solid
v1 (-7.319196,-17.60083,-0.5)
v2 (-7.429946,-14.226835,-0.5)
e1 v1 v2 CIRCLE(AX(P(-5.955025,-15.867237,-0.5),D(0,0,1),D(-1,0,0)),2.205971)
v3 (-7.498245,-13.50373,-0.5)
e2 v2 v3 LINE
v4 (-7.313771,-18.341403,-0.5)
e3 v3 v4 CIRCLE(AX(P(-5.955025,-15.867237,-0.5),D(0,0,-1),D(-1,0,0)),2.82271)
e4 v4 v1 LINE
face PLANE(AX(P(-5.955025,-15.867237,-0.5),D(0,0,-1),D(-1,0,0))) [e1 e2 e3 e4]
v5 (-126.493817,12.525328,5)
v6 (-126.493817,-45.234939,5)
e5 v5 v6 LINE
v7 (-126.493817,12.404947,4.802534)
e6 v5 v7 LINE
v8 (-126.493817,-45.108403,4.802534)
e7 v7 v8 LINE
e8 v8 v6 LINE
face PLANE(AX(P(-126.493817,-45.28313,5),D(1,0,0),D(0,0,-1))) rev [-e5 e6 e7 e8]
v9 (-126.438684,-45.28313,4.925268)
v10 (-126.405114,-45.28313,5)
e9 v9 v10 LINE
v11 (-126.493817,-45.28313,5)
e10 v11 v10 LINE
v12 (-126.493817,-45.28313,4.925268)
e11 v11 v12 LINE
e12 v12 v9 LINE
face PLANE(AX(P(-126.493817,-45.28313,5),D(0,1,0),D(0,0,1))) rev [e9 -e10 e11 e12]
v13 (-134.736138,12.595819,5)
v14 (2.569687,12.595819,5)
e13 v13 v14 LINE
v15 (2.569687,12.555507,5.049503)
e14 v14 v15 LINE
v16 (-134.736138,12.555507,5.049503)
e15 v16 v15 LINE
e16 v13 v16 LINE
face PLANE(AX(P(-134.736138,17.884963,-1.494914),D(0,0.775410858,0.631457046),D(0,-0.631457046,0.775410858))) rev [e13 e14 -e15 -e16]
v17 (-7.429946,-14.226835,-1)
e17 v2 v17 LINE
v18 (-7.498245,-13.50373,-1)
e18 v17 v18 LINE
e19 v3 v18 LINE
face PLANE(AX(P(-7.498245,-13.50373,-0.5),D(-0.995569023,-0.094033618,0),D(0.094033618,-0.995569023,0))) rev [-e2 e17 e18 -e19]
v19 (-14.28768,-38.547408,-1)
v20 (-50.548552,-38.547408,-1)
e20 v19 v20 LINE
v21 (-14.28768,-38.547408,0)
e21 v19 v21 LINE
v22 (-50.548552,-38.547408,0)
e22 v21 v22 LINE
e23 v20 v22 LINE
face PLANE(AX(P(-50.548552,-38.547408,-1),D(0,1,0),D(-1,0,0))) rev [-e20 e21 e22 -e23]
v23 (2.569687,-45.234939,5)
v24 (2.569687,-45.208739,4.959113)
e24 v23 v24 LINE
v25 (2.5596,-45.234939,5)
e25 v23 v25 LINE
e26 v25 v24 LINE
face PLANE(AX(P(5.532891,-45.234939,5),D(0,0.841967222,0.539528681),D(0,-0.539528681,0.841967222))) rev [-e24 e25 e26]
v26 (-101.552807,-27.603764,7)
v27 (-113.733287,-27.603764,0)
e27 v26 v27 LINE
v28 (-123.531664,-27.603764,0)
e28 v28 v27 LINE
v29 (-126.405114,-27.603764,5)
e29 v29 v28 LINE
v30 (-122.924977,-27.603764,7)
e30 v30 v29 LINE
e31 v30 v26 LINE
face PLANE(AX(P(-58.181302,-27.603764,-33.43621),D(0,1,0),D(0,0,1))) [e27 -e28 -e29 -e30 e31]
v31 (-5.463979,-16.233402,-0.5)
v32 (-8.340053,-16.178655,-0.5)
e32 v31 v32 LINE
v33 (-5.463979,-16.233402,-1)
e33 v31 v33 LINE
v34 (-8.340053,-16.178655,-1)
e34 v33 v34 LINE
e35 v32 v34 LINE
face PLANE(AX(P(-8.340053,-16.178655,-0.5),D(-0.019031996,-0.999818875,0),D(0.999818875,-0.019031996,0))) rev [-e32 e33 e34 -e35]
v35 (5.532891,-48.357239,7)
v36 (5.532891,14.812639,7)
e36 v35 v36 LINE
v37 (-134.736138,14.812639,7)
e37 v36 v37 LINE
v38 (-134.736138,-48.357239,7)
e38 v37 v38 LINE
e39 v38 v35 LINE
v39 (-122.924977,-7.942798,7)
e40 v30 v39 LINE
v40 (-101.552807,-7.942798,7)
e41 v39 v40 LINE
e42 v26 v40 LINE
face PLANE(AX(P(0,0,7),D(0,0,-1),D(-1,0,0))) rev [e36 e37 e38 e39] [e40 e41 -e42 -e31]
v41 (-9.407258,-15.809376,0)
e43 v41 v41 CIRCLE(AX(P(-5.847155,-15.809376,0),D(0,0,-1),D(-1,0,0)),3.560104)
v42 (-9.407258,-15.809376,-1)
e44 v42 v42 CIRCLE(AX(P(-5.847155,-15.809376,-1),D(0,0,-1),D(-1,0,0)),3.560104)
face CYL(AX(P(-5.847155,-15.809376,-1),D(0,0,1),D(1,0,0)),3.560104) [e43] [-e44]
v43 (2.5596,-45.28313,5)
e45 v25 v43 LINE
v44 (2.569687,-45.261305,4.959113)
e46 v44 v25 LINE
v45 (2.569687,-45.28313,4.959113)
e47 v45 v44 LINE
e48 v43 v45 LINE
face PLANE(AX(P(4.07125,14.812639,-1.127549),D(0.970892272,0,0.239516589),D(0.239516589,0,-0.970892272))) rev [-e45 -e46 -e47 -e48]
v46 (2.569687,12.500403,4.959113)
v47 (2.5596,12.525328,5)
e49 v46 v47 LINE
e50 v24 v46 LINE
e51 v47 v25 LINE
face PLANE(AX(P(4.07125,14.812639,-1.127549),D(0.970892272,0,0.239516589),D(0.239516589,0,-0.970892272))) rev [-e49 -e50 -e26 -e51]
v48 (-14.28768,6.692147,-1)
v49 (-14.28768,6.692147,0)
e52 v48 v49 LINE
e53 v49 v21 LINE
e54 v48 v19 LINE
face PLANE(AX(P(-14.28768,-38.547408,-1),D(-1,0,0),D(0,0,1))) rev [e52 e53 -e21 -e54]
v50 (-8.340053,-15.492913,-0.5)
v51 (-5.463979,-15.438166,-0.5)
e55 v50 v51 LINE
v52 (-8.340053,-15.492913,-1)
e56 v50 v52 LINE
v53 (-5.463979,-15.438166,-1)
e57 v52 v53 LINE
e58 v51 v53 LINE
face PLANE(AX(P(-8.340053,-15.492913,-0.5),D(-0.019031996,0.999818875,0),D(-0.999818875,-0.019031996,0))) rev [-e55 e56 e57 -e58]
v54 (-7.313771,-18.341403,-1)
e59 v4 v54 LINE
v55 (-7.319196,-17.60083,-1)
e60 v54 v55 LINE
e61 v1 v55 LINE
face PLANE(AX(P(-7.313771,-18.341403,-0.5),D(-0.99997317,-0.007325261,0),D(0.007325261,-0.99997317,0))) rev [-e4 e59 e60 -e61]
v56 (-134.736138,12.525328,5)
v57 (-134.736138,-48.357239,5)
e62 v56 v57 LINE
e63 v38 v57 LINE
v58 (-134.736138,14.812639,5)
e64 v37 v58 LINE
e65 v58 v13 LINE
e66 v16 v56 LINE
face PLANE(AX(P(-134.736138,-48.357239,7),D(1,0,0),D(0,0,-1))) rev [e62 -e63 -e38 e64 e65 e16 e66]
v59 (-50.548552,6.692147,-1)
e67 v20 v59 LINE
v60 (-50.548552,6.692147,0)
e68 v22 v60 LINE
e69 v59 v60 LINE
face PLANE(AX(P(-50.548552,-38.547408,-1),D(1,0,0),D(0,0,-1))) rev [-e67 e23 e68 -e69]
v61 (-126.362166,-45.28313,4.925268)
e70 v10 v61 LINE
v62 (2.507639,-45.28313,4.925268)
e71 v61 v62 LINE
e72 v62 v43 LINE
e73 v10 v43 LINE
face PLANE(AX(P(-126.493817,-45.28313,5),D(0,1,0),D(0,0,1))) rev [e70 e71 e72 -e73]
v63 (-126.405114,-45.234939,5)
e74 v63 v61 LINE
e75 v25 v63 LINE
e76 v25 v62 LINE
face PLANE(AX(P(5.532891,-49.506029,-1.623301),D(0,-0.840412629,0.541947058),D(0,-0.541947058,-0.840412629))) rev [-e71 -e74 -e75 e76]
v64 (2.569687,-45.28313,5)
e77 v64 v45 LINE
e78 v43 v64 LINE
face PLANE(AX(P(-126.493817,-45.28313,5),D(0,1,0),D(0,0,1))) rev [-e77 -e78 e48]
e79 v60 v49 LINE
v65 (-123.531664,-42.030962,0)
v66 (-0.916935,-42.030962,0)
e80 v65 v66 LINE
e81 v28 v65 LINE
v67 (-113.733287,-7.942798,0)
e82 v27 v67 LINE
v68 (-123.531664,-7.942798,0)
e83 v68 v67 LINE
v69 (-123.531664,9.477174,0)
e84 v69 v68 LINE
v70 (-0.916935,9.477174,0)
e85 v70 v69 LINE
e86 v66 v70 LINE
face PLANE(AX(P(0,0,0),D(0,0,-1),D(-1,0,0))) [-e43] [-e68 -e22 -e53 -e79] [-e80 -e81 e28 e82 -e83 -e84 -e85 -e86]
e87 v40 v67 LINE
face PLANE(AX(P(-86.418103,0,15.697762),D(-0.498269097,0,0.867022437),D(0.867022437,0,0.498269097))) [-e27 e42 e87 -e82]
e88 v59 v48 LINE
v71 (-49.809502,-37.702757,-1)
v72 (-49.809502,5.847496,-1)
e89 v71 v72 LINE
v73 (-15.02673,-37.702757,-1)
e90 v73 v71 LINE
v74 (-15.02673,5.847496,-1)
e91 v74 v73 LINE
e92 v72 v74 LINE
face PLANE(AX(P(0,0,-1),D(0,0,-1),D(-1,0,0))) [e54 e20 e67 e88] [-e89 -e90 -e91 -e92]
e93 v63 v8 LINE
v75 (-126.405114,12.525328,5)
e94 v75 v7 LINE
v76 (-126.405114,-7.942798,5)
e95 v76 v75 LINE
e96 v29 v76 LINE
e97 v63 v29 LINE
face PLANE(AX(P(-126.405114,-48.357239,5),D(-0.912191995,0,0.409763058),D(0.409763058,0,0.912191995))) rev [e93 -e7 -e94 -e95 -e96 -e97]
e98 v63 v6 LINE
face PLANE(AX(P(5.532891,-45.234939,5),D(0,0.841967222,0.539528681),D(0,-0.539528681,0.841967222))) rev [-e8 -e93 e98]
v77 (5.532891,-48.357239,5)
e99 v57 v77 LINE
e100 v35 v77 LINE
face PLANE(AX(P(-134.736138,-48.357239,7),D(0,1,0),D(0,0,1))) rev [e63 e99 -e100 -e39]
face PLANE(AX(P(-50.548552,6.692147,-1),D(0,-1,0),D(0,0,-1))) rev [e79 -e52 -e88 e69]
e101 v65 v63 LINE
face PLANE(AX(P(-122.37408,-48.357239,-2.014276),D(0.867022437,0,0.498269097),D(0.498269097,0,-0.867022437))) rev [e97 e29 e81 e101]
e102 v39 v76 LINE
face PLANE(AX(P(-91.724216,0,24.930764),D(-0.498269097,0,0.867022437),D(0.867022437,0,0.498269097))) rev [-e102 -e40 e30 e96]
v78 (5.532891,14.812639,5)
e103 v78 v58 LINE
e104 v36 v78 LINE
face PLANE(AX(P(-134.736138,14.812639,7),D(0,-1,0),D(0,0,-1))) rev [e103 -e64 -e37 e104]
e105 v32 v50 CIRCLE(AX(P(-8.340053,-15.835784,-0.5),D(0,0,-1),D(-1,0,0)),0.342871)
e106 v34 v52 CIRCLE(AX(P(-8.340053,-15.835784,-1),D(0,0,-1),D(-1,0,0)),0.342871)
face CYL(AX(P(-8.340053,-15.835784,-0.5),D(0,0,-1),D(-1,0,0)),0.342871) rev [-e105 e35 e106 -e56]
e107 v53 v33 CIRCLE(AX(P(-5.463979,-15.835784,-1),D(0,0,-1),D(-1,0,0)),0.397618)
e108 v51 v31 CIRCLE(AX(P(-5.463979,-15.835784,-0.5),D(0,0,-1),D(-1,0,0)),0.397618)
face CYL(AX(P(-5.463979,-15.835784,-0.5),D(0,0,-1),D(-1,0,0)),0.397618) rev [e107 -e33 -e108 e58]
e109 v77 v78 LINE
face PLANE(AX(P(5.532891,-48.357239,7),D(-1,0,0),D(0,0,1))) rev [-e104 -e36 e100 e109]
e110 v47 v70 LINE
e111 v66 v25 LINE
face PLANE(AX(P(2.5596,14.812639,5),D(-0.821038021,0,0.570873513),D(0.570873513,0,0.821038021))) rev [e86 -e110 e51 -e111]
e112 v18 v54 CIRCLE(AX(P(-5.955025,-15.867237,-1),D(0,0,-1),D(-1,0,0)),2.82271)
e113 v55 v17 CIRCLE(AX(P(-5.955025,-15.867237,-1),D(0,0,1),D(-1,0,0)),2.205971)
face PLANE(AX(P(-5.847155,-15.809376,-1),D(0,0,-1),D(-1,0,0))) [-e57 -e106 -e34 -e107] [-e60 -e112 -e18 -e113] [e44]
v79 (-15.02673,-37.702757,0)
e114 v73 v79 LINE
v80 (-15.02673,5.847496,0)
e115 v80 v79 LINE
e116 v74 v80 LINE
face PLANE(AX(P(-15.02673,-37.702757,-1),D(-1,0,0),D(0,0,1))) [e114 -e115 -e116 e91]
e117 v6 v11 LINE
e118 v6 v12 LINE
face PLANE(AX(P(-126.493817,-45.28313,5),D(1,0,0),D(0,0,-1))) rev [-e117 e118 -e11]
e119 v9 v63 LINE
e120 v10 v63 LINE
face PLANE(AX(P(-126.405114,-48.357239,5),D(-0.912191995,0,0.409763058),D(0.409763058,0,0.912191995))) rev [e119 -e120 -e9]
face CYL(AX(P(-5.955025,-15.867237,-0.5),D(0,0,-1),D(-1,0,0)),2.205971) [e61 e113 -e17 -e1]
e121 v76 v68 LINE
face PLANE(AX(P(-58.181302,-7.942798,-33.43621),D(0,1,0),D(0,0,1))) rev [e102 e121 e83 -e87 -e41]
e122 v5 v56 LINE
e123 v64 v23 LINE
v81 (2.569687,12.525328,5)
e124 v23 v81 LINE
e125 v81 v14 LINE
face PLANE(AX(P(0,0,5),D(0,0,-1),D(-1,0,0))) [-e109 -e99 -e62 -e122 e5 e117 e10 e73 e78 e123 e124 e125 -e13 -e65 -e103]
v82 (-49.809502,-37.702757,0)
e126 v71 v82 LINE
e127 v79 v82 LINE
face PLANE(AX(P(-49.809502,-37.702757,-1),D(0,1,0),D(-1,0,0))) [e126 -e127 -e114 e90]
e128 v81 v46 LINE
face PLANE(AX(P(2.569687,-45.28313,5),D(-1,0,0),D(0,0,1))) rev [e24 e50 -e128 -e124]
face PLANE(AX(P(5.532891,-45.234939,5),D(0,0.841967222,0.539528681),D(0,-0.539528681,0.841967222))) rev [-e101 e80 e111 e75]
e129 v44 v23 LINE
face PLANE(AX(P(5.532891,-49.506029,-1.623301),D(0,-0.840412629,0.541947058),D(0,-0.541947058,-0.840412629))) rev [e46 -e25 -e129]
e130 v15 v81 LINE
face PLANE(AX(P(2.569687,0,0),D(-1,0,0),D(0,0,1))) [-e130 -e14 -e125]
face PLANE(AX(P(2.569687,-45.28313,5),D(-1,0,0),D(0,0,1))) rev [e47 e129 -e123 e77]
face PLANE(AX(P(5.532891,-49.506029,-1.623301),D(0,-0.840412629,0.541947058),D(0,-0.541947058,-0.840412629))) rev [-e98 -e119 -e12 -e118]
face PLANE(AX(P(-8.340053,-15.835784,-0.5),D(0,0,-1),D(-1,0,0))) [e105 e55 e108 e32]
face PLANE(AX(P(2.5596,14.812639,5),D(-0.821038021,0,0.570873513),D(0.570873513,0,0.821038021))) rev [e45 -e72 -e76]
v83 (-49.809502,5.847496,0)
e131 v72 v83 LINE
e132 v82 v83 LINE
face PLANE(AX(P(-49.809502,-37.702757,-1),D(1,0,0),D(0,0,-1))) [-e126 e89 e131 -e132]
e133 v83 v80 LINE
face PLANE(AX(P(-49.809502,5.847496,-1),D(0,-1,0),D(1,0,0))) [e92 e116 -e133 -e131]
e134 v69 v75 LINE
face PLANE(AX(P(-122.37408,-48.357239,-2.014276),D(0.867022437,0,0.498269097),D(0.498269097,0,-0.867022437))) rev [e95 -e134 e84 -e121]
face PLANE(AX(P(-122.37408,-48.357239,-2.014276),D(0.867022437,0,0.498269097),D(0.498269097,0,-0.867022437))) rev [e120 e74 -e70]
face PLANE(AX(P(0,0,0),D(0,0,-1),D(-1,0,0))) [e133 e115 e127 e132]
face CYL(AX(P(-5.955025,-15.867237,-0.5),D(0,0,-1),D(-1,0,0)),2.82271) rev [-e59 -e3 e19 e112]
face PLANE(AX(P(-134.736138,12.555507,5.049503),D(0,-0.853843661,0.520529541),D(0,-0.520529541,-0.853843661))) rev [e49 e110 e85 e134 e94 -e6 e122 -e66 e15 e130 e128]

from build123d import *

# Parameters (mm, degrees)
SKETCH1_W           = 129.063503861
SKETCH1_H           = 57.862502499
BOSS_EXTRUDE1_DEPTH = 5
SKETCH2_W           = 36.260872389
SKETCH2_H           = 45.239555314
SKETCH2_W_2         = 34.782772322
SKETCH2_H_2         = 43.550253841
BOSS_EXTRUDE2_DEPTH = 1
SKETCH3_R           = 3.560103521
BOSS_EXTRUDE3_DEPTH = 1
CUT_EXTRUDE2_DEPTH  = 0.5
CUT_EXTRUDE3_DEPTH  = 0.5
SKETCH11_W          = 140.269028905
SKETCH11_H          = 63.169878757
BOSS_EXTRUDE4_DEPTH = 2
CUT_EXTRUDE11_DEPTH = 146.740563875
CUT_EXTRUDE12_DEPTH = 149.974025726
CUT_EXTRUDE15_DEPTH = 149.535595308
CUT_EXTRUDE18_DEPTH = 149.974025726
CUT_EXTRUDE20_DEPTH = 40


with BuildPart() as part:
    # Sketch1 → Boss-Extrude1 (new body)
    with BuildSketch(Plane.XY):
        with Locations((-61.962065286, -16.351878859)):
            Rectangle(SKETCH1_W, SKETCH1_H)
    extrude(amount=BOSS_EXTRUDE1_DEPTH)

    # Sketch2 → Boss-Extrude2 (add)
    with BuildSketch(Plane(origin=(0, 0, 0), x_dir=(-1, 0, 0), z_dir=(0, 0, -1))):
        with Locations((32.418116178, -15.92763049)):
            Rectangle(SKETCH2_W, SKETCH2_H)
        with Locations((32.418116178, -15.92763049)):
            Rectangle(SKETCH2_W_2, SKETCH2_H_2, mode=Mode.SUBTRACT)
    extrude(amount=BOSS_EXTRUDE2_DEPTH)

    # Sketch3 → Boss-Extrude3 (add)
    with BuildSketch(Plane(origin=(0, 0, 0), x_dir=(-1, 0, 0), z_dir=(0, 0, -1))):
        with Locations((5.84715491, -15.809376146)):
            Circle(SKETCH3_R)
    extrude(amount=BOSS_EXTRUDE3_DEPTH)

    # Sketch4 → Cut-Extrude2 (cut)
    with BuildSketch(Plane(origin=(0, 0, -1), x_dir=(-1, 0, 0), z_dir=(0, 0, -1))):
        with BuildLine():
            Line((7.498244586, -13.503730374), (7.429945817, -14.22683494))
            ThreePointArc((7.429945817, -14.22683494), (3.750240849, -15.79486572), (7.319195969, -17.600830429))
            Line((7.319195969, -17.600830429), (7.313770936, -18.341402976))
            ThreePointArc((7.313770936, -18.341402976), (3.134365244, -15.759677296), (7.498244586, -13.503730374))
        make_face()
    extrude(amount=-CUT_EXTRUDE2_DEPTH, mode=Mode.SUBTRACT)

    # Sketch5 → Cut-Extrude3 (cut)
    with BuildSketch(Plane(origin=(0, 0, -1), x_dir=(-1, 0, 0), z_dir=(0, 0, -1))):
        with BuildLine():
            Line((8.340052895, -15.49291333), (5.46397868, -15.438165983))
            ThreePointArc((5.46397868, -15.438165983), (5.066360432, -15.835784231), (5.46397868, -16.233402479))
            Line((5.46397868, -16.233402479), (8.340052895, -16.178655131))
            ThreePointArc((8.340052895, -16.178655131), (8.682923796, -15.835784231), (8.340052895, -15.49291333))
        make_face()
    extrude(amount=-CUT_EXTRUDE3_DEPTH, mode=Mode.SUBTRACT)

    # Sketch11 → Boss-Extrude4 (add)
    with BuildSketch(Plane.XY.offset(5)):
        with Locations((-64.601623086, -16.772300036)):
            Rectangle(SKETCH11_W, SKETCH11_H)
    extrude(amount=BOSS_EXTRUDE4_DEPTH)

    # Sketch12 → Cut-Extrude11 (cut, through all)
    with BuildSketch(Plane(origin=(2.569686645, 0, 0), x_dir=(0, 0, -1), z_dir=(1, 0, 0))):
        Polygon((-5.049502584, 12.555506791), (1.376837193, 8.637811028), (1.49491418, 17.884962826), align=None)
    extrude(amount=-CUT_EXTRUDE11_DEPTH, mode=Mode.SUBTRACT)

    # Sketch13 → Cut-Extrude12 (cut, through all)
    with BuildSketch(Plane(origin=(0, 14.812639343, 0), x_dir=(1, 0, 0), z_dir=(0, 1, 0))):
        Polygon((-126.405113906, -5), (-129.311029141, 1.46898876), (-122.374079844, 2.014276014), align=None)
    extrude(amount=-CUT_EXTRUDE12_DEPTH, mode=Mode.SUBTRACT)

    # Sketch14 → Cut-Extrude15 (cut, through all)
    with BuildSketch(Plane.ZY.offset(134.736137539)):
        Polygon((5, -45.234938719), (-1.330755584, -41.178219973), (-1.62330097, -49.506029315), align=None)
    extrude(amount=-CUT_EXTRUDE15_DEPTH, mode=Mode.SUBTRACT)

    # Sketch15 → Cut-Extrude18 (cut, through all)
    with BuildSketch(Plane(origin=(0, -48.357239414, 0), x_dir=(-1, 0, 0), z_dir=(0, -1, 0))):
        Polygon((-2.559600043, -5), (1.778800488, 1.23954643), (-4.071250311, 1.127548689), align=None)
    extrude(amount=-CUT_EXTRUDE18_DEPTH, mode=Mode.SUBTRACT)

    # Sketch17 → Cut-Extrude20 (cut)
    with BuildSketch(Plane(origin=(-92.862199247, 0, -53.366974362), x_dir=(-0.49826909719441087, 0, 0.8670224372996739), z_dir=(-0.8670224372996738, 0, -0.4982690971944108))):
        Polygon((67.318874173, -27.603763834), (67.318874173, -18.809544274), (67.318874173, -7.942798244), (56.669782452, -7.942798244), (56.669782452, -27.603763834), align=None)
    extrude(amount=-CUT_EXTRUDE20_DEPTH, mode=Mode.SUBTRACT)


solid = part.part
